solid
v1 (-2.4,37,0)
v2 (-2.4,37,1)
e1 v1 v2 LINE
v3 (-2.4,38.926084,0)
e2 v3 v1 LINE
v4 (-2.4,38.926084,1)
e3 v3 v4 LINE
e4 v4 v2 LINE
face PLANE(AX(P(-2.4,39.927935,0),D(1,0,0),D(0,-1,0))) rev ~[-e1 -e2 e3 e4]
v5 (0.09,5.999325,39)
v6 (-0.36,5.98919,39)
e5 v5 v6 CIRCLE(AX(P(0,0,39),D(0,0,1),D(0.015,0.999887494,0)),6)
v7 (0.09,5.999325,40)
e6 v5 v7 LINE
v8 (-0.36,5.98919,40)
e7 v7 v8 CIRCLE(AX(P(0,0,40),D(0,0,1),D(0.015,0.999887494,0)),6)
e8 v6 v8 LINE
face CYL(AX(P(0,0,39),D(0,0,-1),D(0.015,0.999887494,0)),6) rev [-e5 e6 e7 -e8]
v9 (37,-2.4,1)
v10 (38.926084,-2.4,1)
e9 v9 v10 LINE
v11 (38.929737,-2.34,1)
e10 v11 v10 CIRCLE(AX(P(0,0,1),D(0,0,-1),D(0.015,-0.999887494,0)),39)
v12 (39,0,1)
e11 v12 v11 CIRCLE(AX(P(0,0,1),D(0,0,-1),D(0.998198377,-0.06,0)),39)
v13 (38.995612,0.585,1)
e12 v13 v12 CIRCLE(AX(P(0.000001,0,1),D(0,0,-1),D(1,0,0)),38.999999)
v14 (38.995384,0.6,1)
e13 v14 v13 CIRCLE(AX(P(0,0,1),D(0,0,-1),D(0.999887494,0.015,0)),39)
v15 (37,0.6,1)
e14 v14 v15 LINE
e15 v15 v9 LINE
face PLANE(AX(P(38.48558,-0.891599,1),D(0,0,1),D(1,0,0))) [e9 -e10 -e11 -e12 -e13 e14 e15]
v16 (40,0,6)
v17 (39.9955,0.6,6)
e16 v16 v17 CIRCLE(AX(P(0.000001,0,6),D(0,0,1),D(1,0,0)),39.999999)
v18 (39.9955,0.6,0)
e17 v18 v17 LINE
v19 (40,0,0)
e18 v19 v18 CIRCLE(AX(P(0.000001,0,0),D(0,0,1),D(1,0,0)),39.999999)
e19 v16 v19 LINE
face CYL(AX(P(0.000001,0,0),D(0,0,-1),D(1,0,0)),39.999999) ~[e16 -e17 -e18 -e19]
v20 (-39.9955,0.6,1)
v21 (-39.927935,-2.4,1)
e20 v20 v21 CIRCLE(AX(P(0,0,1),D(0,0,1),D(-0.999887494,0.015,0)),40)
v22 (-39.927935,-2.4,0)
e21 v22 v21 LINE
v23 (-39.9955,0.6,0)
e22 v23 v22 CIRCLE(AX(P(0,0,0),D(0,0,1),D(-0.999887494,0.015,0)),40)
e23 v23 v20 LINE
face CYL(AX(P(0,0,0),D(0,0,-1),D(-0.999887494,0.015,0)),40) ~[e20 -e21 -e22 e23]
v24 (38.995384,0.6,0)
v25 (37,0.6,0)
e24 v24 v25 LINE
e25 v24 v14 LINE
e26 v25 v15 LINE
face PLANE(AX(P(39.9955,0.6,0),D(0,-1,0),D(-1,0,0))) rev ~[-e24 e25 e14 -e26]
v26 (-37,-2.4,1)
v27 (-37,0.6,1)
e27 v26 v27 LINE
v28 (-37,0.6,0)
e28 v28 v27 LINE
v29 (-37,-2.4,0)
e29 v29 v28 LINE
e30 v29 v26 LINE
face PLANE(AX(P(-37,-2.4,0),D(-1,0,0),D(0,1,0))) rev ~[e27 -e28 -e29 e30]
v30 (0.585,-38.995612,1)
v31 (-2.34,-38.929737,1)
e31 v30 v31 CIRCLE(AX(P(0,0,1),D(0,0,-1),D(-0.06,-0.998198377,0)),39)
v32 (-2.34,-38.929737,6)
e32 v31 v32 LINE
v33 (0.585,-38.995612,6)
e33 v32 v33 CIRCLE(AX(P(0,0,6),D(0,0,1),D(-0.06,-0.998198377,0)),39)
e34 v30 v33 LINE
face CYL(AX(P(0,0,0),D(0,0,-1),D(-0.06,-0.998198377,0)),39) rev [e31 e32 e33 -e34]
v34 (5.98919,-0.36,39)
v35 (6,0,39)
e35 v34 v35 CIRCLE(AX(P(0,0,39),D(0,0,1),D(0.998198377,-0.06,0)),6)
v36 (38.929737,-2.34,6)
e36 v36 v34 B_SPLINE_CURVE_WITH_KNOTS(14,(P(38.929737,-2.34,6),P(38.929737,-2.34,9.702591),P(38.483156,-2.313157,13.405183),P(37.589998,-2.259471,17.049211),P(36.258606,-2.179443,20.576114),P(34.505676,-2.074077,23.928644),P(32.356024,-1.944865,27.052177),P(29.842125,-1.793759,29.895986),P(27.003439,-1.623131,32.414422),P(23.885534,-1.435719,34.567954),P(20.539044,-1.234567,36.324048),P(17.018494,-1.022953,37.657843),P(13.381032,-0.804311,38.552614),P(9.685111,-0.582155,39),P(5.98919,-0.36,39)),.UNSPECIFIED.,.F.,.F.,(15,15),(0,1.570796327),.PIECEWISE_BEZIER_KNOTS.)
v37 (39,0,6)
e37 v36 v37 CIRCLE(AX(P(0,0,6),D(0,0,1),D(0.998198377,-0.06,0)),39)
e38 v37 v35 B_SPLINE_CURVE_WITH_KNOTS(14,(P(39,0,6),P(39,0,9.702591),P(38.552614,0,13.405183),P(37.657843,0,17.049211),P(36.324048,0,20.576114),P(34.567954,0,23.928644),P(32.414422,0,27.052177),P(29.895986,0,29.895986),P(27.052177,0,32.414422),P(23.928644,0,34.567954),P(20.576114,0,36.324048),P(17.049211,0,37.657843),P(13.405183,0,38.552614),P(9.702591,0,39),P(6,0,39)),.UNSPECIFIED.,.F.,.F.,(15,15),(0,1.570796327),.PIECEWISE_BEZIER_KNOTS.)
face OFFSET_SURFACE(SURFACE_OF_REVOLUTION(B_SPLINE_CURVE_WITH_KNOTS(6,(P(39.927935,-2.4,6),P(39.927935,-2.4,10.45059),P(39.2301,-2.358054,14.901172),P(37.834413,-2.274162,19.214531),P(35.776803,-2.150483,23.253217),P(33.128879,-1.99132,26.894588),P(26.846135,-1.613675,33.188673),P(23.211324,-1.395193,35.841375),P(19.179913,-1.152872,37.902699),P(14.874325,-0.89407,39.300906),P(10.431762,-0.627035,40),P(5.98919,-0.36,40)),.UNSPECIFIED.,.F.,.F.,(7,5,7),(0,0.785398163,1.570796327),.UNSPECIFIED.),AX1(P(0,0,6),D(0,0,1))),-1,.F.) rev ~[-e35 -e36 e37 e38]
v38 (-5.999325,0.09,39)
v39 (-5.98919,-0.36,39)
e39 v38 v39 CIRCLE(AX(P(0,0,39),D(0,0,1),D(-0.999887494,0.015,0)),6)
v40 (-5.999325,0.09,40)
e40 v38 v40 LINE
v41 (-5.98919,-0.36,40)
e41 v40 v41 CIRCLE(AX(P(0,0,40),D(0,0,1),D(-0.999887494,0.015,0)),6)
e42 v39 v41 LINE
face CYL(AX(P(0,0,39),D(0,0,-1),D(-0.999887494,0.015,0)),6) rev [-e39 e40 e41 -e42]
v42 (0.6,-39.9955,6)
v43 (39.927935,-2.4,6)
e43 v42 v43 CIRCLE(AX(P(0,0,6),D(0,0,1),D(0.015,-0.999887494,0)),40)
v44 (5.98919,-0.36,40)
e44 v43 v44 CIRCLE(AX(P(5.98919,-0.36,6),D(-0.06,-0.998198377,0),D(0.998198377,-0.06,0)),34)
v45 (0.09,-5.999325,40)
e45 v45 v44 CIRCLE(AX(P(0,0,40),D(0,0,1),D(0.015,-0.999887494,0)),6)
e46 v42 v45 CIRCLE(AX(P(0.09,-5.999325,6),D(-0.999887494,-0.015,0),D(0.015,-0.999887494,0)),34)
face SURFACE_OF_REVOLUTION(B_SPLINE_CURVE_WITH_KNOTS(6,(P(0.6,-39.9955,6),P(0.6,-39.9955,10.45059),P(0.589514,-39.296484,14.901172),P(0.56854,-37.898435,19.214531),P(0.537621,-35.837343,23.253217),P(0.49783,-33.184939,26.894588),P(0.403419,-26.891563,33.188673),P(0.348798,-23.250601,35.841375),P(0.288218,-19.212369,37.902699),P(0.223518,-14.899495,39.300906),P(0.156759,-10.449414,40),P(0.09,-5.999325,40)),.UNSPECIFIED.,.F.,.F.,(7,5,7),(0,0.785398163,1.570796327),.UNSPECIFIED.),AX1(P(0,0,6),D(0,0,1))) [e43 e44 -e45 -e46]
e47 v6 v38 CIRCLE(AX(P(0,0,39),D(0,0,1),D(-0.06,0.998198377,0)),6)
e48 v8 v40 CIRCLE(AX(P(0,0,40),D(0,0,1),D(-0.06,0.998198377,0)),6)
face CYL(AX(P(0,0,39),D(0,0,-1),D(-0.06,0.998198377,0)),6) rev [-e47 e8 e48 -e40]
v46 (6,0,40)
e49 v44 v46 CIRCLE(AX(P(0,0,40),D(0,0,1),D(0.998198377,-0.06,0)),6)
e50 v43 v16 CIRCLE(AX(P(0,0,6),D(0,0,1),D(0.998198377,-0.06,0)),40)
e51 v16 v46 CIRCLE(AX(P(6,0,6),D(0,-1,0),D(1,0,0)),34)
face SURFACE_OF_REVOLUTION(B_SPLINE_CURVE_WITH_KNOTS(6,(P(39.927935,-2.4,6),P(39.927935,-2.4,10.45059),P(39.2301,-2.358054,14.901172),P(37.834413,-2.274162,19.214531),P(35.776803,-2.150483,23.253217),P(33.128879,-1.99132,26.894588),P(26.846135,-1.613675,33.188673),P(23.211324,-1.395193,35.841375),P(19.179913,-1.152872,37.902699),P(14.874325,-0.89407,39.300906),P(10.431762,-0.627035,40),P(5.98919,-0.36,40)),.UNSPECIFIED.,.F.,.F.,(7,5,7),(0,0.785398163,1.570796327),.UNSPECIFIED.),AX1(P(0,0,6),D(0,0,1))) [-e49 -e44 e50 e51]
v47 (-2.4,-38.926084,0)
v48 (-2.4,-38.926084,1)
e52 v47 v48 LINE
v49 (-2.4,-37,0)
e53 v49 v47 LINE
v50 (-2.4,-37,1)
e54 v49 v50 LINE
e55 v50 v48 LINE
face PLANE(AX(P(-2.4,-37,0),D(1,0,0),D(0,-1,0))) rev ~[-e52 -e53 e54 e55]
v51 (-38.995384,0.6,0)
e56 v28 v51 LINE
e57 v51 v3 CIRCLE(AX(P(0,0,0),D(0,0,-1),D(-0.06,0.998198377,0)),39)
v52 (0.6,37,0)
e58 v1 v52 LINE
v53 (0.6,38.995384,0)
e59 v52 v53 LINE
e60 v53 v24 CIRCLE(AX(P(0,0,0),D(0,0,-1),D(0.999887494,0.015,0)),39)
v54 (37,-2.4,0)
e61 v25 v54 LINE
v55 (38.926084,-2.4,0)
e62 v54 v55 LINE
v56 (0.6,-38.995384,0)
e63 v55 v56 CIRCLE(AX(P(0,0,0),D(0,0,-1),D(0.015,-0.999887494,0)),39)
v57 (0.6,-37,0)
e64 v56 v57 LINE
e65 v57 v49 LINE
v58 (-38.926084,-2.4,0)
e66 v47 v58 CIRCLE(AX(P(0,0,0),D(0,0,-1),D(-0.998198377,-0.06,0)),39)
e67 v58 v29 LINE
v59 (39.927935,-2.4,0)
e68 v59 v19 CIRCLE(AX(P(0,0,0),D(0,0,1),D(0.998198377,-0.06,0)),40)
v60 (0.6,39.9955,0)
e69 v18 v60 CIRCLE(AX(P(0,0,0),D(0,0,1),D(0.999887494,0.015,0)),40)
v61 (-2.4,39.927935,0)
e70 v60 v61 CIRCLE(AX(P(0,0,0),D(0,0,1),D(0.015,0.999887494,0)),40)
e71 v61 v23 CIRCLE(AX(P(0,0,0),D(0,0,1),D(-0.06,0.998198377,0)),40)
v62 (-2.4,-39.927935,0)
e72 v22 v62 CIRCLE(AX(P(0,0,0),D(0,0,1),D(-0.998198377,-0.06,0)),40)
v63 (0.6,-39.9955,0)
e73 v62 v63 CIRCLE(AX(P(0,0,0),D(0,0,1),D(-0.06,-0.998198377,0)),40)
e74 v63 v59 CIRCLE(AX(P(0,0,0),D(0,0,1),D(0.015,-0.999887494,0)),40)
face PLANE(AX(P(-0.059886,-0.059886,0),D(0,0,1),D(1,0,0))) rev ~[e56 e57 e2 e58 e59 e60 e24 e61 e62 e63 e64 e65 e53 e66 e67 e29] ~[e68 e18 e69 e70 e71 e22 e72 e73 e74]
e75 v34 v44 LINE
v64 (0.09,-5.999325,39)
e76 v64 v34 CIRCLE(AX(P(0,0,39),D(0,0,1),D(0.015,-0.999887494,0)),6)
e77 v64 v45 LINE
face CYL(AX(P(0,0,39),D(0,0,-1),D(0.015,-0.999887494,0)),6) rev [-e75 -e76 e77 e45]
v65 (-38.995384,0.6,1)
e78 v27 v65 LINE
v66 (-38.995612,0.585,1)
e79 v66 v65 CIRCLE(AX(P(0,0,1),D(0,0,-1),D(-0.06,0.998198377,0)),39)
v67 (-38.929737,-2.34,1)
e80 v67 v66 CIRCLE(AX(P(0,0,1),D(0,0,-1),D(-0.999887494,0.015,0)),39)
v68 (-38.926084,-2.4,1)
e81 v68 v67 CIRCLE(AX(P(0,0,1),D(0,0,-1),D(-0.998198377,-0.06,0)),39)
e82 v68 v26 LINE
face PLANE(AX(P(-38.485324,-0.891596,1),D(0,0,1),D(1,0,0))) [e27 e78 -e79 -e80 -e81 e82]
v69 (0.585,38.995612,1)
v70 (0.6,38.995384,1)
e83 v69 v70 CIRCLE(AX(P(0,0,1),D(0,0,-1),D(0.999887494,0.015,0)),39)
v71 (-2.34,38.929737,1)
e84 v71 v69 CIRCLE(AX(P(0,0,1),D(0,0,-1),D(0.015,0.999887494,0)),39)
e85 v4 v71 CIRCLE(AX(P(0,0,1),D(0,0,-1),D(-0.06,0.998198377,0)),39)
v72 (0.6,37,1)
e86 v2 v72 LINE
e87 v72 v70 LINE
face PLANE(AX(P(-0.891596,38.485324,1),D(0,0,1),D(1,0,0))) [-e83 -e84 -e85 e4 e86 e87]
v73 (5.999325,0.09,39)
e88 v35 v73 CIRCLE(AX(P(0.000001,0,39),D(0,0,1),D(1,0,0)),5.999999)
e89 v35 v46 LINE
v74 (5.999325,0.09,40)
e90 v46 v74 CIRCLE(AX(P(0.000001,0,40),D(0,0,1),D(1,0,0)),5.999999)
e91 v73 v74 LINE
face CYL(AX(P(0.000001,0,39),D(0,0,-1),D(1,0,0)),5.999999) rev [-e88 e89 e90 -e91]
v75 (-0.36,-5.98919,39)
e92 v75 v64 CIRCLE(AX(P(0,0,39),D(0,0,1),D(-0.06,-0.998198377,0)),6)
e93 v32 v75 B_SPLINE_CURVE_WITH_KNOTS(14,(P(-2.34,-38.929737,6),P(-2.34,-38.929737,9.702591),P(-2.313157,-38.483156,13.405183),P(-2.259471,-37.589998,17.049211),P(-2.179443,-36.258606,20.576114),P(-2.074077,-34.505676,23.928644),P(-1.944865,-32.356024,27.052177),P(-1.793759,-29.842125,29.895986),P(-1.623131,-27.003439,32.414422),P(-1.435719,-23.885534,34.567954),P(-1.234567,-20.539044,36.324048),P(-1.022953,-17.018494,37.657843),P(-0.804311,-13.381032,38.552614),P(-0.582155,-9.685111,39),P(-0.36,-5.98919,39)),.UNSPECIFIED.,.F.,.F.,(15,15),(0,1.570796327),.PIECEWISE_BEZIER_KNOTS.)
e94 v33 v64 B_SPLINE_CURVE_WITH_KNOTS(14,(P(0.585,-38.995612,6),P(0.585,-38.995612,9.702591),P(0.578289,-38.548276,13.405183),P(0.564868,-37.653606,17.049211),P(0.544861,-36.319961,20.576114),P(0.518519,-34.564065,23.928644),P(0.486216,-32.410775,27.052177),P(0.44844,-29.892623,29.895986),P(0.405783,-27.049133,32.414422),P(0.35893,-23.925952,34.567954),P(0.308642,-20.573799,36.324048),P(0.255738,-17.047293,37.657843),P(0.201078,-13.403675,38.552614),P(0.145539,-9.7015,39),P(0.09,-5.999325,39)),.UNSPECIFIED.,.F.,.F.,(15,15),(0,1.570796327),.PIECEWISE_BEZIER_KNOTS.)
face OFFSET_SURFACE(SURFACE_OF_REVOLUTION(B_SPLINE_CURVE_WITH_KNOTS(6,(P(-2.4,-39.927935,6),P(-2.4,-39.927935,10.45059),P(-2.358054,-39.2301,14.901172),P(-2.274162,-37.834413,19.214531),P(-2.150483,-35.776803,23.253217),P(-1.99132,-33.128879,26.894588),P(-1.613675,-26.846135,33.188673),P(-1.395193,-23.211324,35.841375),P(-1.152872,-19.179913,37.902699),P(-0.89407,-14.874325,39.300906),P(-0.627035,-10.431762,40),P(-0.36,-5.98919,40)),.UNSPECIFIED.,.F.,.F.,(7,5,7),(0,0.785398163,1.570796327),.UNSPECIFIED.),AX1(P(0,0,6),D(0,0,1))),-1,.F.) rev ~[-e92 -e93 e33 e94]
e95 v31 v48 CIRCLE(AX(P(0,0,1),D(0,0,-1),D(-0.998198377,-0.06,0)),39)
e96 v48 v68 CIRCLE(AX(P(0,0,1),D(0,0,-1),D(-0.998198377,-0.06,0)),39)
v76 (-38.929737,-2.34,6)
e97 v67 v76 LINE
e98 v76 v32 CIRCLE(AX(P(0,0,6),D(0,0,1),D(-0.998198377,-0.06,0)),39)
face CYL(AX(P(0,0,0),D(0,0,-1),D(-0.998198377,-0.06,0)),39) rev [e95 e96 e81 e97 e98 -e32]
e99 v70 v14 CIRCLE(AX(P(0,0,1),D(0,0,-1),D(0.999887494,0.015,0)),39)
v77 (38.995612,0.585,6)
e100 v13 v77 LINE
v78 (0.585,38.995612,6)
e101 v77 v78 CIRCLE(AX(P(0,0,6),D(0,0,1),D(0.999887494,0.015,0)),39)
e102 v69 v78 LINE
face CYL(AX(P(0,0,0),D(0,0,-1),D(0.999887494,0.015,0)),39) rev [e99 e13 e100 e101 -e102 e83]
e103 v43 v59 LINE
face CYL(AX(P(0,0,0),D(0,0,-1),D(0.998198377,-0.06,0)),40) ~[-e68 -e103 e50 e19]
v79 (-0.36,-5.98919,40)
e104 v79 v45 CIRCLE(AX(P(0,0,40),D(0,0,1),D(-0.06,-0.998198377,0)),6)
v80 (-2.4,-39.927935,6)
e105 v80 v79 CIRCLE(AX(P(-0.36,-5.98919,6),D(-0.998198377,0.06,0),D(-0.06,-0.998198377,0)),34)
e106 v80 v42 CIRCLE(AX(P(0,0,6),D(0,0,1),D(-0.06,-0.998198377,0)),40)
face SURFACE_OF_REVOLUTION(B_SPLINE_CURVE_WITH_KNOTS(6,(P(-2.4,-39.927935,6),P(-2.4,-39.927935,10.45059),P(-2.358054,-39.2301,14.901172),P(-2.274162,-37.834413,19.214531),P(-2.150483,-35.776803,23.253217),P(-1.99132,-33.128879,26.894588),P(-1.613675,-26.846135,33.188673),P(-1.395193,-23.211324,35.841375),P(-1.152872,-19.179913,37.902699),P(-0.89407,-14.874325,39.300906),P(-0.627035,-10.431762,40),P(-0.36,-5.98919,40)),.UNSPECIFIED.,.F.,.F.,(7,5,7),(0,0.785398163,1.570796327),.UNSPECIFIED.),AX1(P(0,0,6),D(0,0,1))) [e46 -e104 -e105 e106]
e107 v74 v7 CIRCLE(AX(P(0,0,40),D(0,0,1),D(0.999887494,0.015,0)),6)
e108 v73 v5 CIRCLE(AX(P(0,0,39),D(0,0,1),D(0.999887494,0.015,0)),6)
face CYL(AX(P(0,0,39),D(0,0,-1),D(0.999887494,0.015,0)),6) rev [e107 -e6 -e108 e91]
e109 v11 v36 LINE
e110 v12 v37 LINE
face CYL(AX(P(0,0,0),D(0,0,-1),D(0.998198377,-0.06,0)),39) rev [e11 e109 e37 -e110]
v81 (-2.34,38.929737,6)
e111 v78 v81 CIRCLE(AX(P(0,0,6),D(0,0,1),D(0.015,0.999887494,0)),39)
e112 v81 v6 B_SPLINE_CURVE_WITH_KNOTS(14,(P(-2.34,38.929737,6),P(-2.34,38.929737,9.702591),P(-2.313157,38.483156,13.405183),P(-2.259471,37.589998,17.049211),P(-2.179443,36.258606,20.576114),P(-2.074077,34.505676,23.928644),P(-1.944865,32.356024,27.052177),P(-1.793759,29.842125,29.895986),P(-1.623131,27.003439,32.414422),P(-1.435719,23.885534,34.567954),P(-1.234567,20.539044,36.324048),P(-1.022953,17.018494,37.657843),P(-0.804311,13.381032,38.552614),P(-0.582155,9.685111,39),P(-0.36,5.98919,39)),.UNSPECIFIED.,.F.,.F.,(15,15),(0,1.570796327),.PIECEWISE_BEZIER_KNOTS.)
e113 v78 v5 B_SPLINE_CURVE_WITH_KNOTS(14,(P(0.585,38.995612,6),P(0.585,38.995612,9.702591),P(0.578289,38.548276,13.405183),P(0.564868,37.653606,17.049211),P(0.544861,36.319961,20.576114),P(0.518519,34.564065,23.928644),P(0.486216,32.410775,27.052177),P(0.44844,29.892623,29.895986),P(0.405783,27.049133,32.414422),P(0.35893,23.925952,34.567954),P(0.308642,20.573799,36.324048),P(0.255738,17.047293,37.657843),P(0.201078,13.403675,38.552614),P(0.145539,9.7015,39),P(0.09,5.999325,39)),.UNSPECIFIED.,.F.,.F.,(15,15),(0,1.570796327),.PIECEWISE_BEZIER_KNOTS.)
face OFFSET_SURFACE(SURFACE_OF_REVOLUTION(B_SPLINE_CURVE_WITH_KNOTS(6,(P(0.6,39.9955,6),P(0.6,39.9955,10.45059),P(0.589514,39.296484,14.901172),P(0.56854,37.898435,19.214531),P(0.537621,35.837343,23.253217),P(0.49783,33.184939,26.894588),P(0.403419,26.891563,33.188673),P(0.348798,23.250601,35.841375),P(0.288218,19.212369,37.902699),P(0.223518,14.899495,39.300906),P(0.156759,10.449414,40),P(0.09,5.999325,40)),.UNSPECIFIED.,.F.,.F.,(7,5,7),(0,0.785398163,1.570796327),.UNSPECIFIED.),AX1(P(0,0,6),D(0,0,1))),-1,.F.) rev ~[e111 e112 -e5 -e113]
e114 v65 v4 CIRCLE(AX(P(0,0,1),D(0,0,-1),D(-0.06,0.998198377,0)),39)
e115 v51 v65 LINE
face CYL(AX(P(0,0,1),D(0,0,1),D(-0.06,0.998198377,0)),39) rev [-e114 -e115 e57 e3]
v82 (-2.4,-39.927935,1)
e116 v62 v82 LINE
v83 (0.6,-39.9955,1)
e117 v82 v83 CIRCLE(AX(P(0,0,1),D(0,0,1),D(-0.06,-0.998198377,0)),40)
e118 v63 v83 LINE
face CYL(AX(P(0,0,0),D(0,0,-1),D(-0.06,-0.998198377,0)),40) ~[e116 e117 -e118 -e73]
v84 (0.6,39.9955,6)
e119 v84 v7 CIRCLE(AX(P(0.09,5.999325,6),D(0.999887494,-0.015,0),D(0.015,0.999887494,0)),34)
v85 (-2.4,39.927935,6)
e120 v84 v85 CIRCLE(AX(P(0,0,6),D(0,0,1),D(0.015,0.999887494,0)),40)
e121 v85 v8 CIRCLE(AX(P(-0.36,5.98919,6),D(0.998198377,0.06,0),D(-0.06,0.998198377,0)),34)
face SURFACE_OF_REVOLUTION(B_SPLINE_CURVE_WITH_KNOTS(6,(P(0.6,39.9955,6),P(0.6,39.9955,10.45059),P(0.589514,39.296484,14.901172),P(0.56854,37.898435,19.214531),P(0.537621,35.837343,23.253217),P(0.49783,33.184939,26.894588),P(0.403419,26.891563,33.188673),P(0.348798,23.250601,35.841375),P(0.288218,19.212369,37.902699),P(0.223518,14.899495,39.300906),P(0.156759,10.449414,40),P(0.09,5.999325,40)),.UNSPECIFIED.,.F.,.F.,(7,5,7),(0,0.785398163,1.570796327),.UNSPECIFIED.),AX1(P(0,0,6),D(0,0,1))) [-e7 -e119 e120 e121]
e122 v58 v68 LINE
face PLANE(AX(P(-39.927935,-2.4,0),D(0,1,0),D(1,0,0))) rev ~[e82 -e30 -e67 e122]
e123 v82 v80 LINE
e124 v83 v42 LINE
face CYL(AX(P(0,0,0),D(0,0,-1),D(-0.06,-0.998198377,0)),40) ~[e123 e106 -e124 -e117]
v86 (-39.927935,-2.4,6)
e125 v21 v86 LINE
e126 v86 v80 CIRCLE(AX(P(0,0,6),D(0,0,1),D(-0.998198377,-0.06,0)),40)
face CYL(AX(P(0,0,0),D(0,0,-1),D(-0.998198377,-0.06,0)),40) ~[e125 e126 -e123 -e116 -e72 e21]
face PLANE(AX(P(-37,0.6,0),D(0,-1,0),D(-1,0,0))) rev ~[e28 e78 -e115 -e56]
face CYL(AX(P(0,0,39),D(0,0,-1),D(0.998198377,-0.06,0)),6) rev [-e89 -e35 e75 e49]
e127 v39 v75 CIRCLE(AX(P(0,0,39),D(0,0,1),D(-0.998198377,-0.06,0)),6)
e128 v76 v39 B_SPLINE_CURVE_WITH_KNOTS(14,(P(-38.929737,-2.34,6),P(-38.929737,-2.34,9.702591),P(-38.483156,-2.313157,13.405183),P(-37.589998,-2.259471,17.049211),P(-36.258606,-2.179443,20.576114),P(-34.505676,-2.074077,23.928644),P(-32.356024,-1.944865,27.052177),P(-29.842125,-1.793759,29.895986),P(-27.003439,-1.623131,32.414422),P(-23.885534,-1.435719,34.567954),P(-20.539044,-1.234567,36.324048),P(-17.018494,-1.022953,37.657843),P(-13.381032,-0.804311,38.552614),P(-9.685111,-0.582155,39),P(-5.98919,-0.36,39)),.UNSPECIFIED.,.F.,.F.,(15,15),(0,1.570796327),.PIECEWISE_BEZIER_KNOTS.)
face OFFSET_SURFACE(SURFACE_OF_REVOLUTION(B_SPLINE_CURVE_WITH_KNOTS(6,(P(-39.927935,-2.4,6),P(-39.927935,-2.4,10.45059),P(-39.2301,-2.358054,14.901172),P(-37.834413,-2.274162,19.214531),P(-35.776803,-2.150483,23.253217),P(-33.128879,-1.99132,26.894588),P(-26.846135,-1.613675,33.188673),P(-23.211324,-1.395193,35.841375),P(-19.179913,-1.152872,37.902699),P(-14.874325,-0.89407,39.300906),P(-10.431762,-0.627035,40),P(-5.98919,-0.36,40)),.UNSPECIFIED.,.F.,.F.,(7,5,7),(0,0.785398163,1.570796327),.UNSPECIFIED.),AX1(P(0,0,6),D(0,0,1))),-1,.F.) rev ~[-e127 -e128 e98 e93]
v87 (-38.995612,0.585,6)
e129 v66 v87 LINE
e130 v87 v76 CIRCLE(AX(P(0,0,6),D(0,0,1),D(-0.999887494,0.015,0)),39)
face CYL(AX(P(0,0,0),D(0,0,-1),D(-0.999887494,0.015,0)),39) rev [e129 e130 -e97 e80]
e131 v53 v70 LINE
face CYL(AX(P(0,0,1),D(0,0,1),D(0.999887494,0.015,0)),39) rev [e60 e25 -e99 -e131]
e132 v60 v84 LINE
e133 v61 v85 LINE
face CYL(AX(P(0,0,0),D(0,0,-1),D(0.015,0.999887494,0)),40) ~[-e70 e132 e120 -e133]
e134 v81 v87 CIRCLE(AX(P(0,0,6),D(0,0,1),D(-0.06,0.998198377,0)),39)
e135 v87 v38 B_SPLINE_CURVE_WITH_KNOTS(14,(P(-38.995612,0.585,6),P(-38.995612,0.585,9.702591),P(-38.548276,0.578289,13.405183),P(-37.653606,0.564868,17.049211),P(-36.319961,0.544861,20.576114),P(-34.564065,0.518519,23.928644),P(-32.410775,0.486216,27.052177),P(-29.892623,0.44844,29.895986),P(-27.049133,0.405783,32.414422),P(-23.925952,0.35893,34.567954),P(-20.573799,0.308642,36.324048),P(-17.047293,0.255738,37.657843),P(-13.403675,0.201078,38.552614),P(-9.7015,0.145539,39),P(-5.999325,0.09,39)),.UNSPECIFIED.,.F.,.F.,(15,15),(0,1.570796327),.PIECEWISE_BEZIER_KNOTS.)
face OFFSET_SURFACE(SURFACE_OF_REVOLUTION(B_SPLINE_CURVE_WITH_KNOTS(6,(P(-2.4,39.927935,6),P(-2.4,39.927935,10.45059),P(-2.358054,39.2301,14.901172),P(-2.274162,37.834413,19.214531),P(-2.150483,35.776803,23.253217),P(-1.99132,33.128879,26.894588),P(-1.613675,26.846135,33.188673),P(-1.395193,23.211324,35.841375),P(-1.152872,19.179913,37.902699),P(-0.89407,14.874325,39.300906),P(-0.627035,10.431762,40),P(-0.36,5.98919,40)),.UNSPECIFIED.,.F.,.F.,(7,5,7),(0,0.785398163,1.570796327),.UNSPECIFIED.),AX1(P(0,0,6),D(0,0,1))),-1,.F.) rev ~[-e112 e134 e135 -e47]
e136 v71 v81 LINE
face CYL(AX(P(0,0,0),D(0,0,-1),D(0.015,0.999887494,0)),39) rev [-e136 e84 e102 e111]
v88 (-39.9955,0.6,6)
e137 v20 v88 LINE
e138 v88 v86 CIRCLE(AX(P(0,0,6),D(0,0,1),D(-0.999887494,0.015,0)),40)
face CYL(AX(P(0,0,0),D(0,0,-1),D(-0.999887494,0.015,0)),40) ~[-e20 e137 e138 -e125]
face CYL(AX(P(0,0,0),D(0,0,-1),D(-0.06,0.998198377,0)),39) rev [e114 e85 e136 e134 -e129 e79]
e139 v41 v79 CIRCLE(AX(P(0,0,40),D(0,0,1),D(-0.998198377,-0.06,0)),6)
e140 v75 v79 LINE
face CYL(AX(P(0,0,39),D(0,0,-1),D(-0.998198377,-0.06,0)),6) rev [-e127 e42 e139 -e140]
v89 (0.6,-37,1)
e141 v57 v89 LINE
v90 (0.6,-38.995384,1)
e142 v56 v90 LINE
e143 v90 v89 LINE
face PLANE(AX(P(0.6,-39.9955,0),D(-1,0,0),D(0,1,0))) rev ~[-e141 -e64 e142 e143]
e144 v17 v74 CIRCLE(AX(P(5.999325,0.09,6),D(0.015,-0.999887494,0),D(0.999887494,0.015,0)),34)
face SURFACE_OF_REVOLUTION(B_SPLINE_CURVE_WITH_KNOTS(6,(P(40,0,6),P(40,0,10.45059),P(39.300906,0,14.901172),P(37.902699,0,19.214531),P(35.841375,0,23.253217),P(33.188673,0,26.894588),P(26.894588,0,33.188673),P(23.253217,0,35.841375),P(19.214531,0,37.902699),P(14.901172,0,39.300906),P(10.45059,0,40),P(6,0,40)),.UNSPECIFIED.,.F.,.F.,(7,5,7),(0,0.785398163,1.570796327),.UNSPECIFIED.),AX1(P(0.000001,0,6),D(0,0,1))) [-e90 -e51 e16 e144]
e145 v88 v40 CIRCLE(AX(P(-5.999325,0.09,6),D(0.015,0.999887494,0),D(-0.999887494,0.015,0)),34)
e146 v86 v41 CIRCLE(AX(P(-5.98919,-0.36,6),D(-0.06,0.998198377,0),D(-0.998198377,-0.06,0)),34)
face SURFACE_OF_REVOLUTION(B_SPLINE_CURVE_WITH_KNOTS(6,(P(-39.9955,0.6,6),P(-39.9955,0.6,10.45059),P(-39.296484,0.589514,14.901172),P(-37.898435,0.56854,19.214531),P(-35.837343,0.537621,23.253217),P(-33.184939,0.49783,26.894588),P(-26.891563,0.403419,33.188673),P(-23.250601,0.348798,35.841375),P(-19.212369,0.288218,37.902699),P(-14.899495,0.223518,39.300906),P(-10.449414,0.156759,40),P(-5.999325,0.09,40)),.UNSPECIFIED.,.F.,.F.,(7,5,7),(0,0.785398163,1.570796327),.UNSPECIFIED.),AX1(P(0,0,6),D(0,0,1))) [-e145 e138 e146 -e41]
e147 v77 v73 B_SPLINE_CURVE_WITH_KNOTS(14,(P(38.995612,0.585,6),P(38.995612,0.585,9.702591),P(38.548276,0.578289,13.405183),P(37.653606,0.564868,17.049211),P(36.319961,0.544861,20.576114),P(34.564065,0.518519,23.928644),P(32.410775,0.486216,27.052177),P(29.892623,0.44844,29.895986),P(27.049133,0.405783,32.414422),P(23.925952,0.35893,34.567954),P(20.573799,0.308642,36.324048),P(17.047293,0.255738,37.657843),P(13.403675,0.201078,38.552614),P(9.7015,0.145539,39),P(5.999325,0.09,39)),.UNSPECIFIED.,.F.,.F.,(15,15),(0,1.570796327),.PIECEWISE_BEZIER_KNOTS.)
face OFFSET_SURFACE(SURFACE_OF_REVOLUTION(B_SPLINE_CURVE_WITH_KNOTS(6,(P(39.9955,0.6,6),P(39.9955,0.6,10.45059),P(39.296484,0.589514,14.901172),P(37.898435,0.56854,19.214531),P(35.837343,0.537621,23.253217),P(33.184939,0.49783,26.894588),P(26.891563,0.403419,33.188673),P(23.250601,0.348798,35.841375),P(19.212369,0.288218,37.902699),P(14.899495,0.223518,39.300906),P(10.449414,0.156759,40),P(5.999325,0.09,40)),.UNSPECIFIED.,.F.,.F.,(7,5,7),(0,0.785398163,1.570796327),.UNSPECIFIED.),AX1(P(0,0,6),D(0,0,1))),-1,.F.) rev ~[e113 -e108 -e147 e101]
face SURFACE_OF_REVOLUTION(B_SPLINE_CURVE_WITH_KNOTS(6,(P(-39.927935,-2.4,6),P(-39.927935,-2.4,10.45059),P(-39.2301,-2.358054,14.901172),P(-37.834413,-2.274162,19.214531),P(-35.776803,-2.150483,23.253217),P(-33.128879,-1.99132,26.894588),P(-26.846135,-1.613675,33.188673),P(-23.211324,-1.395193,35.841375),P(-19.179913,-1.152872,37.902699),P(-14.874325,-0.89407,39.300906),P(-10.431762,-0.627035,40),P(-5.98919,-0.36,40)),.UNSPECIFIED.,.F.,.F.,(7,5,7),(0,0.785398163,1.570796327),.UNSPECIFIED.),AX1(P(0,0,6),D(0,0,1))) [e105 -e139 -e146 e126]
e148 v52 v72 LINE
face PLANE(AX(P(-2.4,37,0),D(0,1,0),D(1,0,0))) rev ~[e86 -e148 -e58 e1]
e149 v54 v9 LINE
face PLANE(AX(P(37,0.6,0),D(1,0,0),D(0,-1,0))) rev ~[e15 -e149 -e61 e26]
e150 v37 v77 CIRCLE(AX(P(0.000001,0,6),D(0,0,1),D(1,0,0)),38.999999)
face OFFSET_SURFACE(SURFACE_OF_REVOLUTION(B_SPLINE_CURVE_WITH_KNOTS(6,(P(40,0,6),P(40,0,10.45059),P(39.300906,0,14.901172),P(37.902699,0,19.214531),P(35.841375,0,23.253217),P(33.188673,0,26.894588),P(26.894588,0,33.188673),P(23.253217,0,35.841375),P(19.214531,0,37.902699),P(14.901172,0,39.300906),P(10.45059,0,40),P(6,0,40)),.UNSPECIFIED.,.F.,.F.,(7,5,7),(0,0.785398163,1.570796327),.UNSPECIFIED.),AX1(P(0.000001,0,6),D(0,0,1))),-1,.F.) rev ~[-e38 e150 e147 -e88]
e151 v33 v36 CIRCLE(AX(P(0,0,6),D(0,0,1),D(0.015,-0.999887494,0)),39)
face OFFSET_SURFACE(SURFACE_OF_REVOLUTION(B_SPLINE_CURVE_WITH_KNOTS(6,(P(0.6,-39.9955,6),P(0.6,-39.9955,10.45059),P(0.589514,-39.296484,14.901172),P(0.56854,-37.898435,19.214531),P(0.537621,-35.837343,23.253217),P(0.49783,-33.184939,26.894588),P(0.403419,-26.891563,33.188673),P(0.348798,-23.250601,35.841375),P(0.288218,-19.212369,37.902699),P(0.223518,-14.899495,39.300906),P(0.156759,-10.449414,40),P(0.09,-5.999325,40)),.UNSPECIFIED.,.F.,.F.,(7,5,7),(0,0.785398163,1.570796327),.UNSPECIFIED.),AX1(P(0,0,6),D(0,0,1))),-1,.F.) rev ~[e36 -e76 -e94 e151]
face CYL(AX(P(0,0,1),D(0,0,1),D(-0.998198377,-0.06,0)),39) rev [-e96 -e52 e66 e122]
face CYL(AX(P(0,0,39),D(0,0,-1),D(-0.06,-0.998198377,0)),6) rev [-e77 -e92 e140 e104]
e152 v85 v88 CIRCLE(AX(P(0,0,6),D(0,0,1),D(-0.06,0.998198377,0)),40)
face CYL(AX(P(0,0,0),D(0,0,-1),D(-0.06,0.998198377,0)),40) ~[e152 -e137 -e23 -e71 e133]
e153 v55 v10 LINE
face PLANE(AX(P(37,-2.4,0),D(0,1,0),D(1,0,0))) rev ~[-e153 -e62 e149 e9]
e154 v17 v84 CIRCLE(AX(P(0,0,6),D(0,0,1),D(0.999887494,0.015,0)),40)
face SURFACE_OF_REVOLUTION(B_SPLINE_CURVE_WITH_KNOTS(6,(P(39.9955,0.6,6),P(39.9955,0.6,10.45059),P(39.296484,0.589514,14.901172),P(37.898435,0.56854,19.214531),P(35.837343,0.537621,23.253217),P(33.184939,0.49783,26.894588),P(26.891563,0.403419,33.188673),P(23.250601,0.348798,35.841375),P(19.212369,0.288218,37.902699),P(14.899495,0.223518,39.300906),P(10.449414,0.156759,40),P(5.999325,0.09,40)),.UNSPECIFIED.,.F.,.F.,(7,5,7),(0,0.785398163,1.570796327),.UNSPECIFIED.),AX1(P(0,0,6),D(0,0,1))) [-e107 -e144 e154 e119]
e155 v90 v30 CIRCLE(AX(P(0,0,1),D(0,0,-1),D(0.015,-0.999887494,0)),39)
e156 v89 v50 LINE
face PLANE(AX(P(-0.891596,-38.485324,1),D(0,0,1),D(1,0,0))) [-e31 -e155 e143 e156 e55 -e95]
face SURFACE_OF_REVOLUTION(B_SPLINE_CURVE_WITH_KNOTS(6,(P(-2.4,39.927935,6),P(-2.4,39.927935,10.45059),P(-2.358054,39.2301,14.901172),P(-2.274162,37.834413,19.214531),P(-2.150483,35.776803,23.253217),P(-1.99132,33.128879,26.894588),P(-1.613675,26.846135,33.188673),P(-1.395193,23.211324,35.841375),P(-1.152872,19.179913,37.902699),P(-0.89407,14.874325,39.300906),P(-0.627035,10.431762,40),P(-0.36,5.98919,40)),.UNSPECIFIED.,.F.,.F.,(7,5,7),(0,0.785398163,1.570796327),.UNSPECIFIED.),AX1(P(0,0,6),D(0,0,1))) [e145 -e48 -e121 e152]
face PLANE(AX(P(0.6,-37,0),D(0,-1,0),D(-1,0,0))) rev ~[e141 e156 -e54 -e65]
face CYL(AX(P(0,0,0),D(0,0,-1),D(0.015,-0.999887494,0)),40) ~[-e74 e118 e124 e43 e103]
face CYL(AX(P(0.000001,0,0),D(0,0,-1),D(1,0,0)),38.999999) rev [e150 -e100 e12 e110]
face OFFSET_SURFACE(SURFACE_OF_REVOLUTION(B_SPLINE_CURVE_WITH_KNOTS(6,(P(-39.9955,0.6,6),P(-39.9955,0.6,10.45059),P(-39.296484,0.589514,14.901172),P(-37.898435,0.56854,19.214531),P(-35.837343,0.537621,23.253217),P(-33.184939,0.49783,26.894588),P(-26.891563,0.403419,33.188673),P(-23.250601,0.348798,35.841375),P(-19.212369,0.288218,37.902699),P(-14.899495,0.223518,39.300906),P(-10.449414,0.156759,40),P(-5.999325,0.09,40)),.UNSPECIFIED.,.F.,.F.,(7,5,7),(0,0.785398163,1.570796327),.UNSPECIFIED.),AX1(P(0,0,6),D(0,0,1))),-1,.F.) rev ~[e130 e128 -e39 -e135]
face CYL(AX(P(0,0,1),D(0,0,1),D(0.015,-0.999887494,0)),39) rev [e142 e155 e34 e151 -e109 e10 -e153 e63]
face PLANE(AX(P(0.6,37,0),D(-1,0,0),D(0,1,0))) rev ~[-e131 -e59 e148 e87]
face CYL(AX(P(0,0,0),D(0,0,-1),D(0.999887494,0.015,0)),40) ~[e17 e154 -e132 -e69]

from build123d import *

# Parameters (mm, degrees)
F1_DEPTH = 40
F2_R     = 34
F3_T     = -1
F4_DEPTH = 1


# Not quite as in the source:
# - a shell that OpenCascade refuses in one call is made with other operations: the cavity is built on its own and cut out
# - a feature names something its author has since deleted; it is built from what else it names


with BuildPart() as f1:
    # F0 (on Top) → F1 (new body)
    with BuildSketch(Plane.XY):
        with BuildLine():
            Line((37, 0.6), (39.9954997468, 0.6))
            ThreePointArc((39.9954997468, 0.6), (28.2842712475, 28.2842712475), (0.6, 39.9954997468))
            Line((0.6, 39.9954997468), (0.6, 37))
            Line((0.6, 37), (-2.4, 37))
            Line((-2.4, 37), (-2.4, 39.9279350831))
            ThreePointArc((-2.4, 39.9279350831), (-28.9139450641, 27.6402565261), (-39.9954997468, 0.6))
            Line((-39.9954997468, 0.6), (-37, 0.6))
            Line((-37, 0.6), (-37, -2.4))
            Line((-37, -2.4), (-39.9279350831, -2.4))
            ThreePointArc((-39.9279350831, -2.4), (-28.2842712475, -28.2842712475), (-2.4, -39.9279350831))
            Line((-2.4, -39.9279350831), (-2.4, -37))
            Line((-2.4, -37), (0.6, -37))
            Line((0.6, -37), (0.6, -39.9954997468))
            ThreePointArc((0.6, -39.9954997468), (27.6402565261, -28.9139450641), (39.9279350831, -2.4))
            Line((39.9279350831, -2.4), (37, -2.4))
            Line((37, -2.4), (37, 0.6))
        make_face()
        with BuildLine():
            ThreePointArc((39.9279350831, -2.4), (39.9819797116, -1.2005408523), (40, 0))
            ThreePointArc((40, 0), (39.9988749209, 0.3000084383), (39.9954997468, 0.6))
            Line((39.9954997468, 0.6), (37, 0.6))
            Line((37, 0.6), (37, -2.4))
            Line((37, -2.4), (39.9279350831, -2.4))
        make_face()
        with BuildLine():
            Line((37, 0.6), (39.9954997468, 0.6))
            ThreePointArc((39.9954997468, 0.6), (28.2842712475, 28.2842712475), (0.6, 39.9954997468))
            Line((0.6, 39.9954997468), (0.6, 37))
            Line((0.6, 37), (-2.4, 37))
            Line((-2.4, 37), (-2.4, 39.9279350831))
            ThreePointArc((-2.4, 39.9279350831), (-28.9139450641, 27.6402565261), (-39.9954997468, 0.6))
            Line((-39.9954997468, 0.6), (-37, 0.6))
            Line((-37, 0.6), (-37, -2.4))
            Line((-37, -2.4), (-39.9279350831, -2.4))
            ThreePointArc((-39.9279350831, -2.4), (-28.2842712475, -28.2842712475), (-2.4, -39.9279350831))
            Line((-2.4, -39.9279350831), (-2.4, -37))
            Line((-2.4, -37), (0.6, -37))
            Line((0.6, -37), (0.6, -39.9954997468))
            ThreePointArc((0.6, -39.9954997468), (27.6402565261, -28.9139450641), (39.9279350831, -2.4))
            Line((39.9279350831, -2.4), (37, -2.4))
            Line((37, -2.4), (37, 0.6))
        make_face()
        with BuildLine():
            Line((37, 0.6), (39.9954997468, 0.6))
            ThreePointArc((39.9954997468, 0.6), (28.2842712475, 28.2842712475), (0.6, 39.9954997468))
            Line((0.6, 39.9954997468), (0.6, 37))
            Line((0.6, 37), (-2.4, 37))
            Line((-2.4, 37), (-2.4, 39.9279350831))
            ThreePointArc((-2.4, 39.9279350831), (-28.9139450641, 27.6402565261), (-39.9954997468, 0.6))
            Line((-39.9954997468, 0.6), (-37, 0.6))
            Line((-37, 0.6), (-37, -2.4))
            Line((-37, -2.4), (-39.9279350831, -2.4))
            ThreePointArc((-39.9279350831, -2.4), (-28.2842712475, -28.2842712475), (-2.4, -39.9279350831))
            Line((-2.4, -39.9279350831), (-2.4, -37))
            Line((-2.4, -37), (0.6, -37))
            Line((0.6, -37), (0.6, -39.9954997468))
            ThreePointArc((0.6, -39.9954997468), (27.6402565261, -28.9139450641), (39.9279350831, -2.4))
            Line((39.9279350831, -2.4), (37, -2.4))
            Line((37, -2.4), (37, 0.6))
        make_face()
        with BuildLine():
            Line((37, 0.6), (39.9954997468, 0.6))
            ThreePointArc((39.9954997468, 0.6), (28.2842712475, 28.2842712475), (0.6, 39.9954997468))
            Line((0.6, 39.9954997468), (0.6, 37))
            Line((0.6, 37), (-2.4, 37))
            Line((-2.4, 37), (-2.4, 39.9279350831))
            ThreePointArc((-2.4, 39.9279350831), (-28.9139450641, 27.6402565261), (-39.9954997468, 0.6))
            Line((-39.9954997468, 0.6), (-37, 0.6))
            Line((-37, 0.6), (-37, -2.4))
            Line((-37, -2.4), (-39.9279350831, -2.4))
            ThreePointArc((-39.9279350831, -2.4), (-28.2842712475, -28.2842712475), (-2.4, -39.9279350831))
            Line((-2.4, -39.9279350831), (-2.4, -37))
            Line((-2.4, -37), (0.6, -37))
            Line((0.6, -37), (0.6, -39.9954997468))
            ThreePointArc((0.6, -39.9954997468), (27.6402565261, -28.9139450641), (39.9279350831, -2.4))
            Line((39.9279350831, -2.4), (37, -2.4))
            Line((37, -2.4), (37, 0.6))
        make_face()
        with BuildLine():
            ThreePointArc((39.9279350831, -2.4), (39.9819797116, -1.2005408523), (40, 0))
            ThreePointArc((40, 0), (39.9988749209, 0.3000084383), (39.9954997468, 0.6))
            Line((39.9954997468, 0.6), (37, 0.6))
            Line((37, 0.6), (37, -2.4))
            Line((37, -2.4), (39.9279350831, -2.4))
        make_face()
        with BuildLine():
            ThreePointArc((-2.4, -39.9279350831), (-0.9006338024, -39.989859449), (0.6, -39.9954997468))
            Line((0.6, -39.9954997468), (0.6, -37))
            Line((0.6, -37), (-2.4, -37))
            Line((-2.4, -37), (-2.4, -39.9279350831))
        make_face()
        with BuildLine():
            Line((-37, 0.6), (-39.9954997468, 0.6))
            ThreePointArc((-39.9954997468, 0.6), (-39.989859449, -0.9006338024), (-39.9279350831, -2.4))
            Line((-39.9279350831, -2.4), (-37, -2.4))
            Line((-37, -2.4), (-37, 0.6))
        make_face()
        with BuildLine():
            Line((0.6, 37), (0.6, 39.9954997468))
            ThreePointArc((0.6, 39.9954997468), (-0.9006338024, 39.989859449), (-2.4, 39.9279350831))
            Line((-2.4, 39.9279350831), (-2.4, 37))
            Line((-2.4, 37), (0.6, 37))
        make_face()
        with BuildLine():
            Line((37, 0.6), (39.9954997468, 0.6))
            ThreePointArc((39.9954997468, 0.6), (28.2842712475, 28.2842712475), (0.6, 39.9954997468))
            Line((0.6, 39.9954997468), (0.6, 37))
            Line((0.6, 37), (-2.4, 37))
            Line((-2.4, 37), (-2.4, 39.9279350831))
            ThreePointArc((-2.4, 39.9279350831), (-28.9139450641, 27.6402565261), (-39.9954997468, 0.6))
            Line((-39.9954997468, 0.6), (-37, 0.6))
            Line((-37, 0.6), (-37, -2.4))
            Line((-37, -2.4), (-39.9279350831, -2.4))
            ThreePointArc((-39.9279350831, -2.4), (-28.2842712475, -28.2842712475), (-2.4, -39.9279350831))
            Line((-2.4, -39.9279350831), (-2.4, -37))
            Line((-2.4, -37), (0.6, -37))
            Line((0.6, -37), (0.6, -39.9954997468))
            ThreePointArc((0.6, -39.9954997468), (27.6402565261, -28.9139450641), (39.9279350831, -2.4))
            Line((39.9279350831, -2.4), (37, -2.4))
            Line((37, -2.4), (37, 0.6))
        make_face()
        with BuildLine():
            Line((37, 0.6), (39.9954997468, 0.6))
            ThreePointArc((39.9954997468, 0.6), (28.2842712475, 28.2842712475), (0.6, 39.9954997468))
            Line((0.6, 39.9954997468), (0.6, 37))
            Line((0.6, 37), (-2.4, 37))
            Line((-2.4, 37), (-2.4, 39.9279350831))
            ThreePointArc((-2.4, 39.9279350831), (-28.9139450641, 27.6402565261), (-39.9954997468, 0.6))
            Line((-39.9954997468, 0.6), (-37, 0.6))
            Line((-37, 0.6), (-37, -2.4))
            Line((-37, -2.4), (-39.9279350831, -2.4))
            ThreePointArc((-39.9279350831, -2.4), (-28.2842712475, -28.2842712475), (-2.4, -39.9279350831))
            Line((-2.4, -39.9279350831), (-2.4, -37))
            Line((-2.4, -37), (0.6, -37))
            Line((0.6, -37), (0.6, -39.9954997468))
            ThreePointArc((0.6, -39.9954997468), (27.6402565261, -28.9139450641), (39.9279350831, -2.4))
            Line((39.9279350831, -2.4), (37, -2.4))
            Line((37, -2.4), (37, 0.6))
        make_face()
    extrude(amount=F1_DEPTH)

    # F2
    f2_edges = [f1.edges().sort_by_distance(p)[0] for p in [
        (-0.6, -39.9955, 40),
    ]]
    fillet(f2_edges, radius=F2_R)

    # F3: a shell. OpenCascade refuses it in one call, so the cavity is built on its own and cut out:
    # the body offset inwards by the wall thickness, plus a prism from it out through each open face.
    f3_core = offset(f1.part, amount=F3_T, mode=Mode.PRIVATE)
    f3_exits = [f3_core.faces().sort_by_distance(p)[0] for p in [
        (0, 0, 39),
        (0, 0, 1),
    ]]
    add(f3_core, mode=Mode.SUBTRACT)
    extrude(f3_exits, amount=-F3_T, mode=Mode.SUBTRACT)

    # F0 (on Top) → F4 (join)
    with BuildSketch(Plane.XY):
        with BuildLine():
            ThreePointArc((39.9279350831, -2.4), (39.9819797116, -1.2005408523), (40, 0))
            ThreePointArc((40, 0), (39.9988749209, 0.3000084383), (39.9954997468, 0.6))
            Line((39.9954997468, 0.6), (37, 0.6))
            Line((37, 0.6), (37, -2.4))
            Line((37, -2.4), (39.9279350831, -2.4))
        make_face()
        with BuildLine():
            Line((0.6, 37), (0.6, 39.9954997468))
            ThreePointArc((0.6, 39.9954997468), (-0.9006338024, 39.989859449), (-2.4, 39.9279350831))
            Line((-2.4, 39.9279350831), (-2.4, 37))
            Line((-2.4, 37), (0.6, 37))
        make_face()
        with BuildLine():
            Line((-37, 0.6), (-39.9954997468, 0.6))
            ThreePointArc((-39.9954997468, 0.6), (-39.989859449, -0.9006338024), (-39.9279350831, -2.4))
            Line((-39.9279350831, -2.4), (-37, -2.4))
            Line((-37, -2.4), (-37, 0.6))
        make_face()
        with BuildLine():
            ThreePointArc((-2.4, -39.9279350831), (-0.9006338024, -39.989859449), (0.6, -39.9954997468))
            Line((0.6, -39.9954997468), (0.6, -37))
            Line((0.6, -37), (-2.4, -37))
            Line((-2.4, -37), (-2.4, -39.9279350831))
        make_face()
    extrude(amount=F4_DEPTH)


solid = f1.part
